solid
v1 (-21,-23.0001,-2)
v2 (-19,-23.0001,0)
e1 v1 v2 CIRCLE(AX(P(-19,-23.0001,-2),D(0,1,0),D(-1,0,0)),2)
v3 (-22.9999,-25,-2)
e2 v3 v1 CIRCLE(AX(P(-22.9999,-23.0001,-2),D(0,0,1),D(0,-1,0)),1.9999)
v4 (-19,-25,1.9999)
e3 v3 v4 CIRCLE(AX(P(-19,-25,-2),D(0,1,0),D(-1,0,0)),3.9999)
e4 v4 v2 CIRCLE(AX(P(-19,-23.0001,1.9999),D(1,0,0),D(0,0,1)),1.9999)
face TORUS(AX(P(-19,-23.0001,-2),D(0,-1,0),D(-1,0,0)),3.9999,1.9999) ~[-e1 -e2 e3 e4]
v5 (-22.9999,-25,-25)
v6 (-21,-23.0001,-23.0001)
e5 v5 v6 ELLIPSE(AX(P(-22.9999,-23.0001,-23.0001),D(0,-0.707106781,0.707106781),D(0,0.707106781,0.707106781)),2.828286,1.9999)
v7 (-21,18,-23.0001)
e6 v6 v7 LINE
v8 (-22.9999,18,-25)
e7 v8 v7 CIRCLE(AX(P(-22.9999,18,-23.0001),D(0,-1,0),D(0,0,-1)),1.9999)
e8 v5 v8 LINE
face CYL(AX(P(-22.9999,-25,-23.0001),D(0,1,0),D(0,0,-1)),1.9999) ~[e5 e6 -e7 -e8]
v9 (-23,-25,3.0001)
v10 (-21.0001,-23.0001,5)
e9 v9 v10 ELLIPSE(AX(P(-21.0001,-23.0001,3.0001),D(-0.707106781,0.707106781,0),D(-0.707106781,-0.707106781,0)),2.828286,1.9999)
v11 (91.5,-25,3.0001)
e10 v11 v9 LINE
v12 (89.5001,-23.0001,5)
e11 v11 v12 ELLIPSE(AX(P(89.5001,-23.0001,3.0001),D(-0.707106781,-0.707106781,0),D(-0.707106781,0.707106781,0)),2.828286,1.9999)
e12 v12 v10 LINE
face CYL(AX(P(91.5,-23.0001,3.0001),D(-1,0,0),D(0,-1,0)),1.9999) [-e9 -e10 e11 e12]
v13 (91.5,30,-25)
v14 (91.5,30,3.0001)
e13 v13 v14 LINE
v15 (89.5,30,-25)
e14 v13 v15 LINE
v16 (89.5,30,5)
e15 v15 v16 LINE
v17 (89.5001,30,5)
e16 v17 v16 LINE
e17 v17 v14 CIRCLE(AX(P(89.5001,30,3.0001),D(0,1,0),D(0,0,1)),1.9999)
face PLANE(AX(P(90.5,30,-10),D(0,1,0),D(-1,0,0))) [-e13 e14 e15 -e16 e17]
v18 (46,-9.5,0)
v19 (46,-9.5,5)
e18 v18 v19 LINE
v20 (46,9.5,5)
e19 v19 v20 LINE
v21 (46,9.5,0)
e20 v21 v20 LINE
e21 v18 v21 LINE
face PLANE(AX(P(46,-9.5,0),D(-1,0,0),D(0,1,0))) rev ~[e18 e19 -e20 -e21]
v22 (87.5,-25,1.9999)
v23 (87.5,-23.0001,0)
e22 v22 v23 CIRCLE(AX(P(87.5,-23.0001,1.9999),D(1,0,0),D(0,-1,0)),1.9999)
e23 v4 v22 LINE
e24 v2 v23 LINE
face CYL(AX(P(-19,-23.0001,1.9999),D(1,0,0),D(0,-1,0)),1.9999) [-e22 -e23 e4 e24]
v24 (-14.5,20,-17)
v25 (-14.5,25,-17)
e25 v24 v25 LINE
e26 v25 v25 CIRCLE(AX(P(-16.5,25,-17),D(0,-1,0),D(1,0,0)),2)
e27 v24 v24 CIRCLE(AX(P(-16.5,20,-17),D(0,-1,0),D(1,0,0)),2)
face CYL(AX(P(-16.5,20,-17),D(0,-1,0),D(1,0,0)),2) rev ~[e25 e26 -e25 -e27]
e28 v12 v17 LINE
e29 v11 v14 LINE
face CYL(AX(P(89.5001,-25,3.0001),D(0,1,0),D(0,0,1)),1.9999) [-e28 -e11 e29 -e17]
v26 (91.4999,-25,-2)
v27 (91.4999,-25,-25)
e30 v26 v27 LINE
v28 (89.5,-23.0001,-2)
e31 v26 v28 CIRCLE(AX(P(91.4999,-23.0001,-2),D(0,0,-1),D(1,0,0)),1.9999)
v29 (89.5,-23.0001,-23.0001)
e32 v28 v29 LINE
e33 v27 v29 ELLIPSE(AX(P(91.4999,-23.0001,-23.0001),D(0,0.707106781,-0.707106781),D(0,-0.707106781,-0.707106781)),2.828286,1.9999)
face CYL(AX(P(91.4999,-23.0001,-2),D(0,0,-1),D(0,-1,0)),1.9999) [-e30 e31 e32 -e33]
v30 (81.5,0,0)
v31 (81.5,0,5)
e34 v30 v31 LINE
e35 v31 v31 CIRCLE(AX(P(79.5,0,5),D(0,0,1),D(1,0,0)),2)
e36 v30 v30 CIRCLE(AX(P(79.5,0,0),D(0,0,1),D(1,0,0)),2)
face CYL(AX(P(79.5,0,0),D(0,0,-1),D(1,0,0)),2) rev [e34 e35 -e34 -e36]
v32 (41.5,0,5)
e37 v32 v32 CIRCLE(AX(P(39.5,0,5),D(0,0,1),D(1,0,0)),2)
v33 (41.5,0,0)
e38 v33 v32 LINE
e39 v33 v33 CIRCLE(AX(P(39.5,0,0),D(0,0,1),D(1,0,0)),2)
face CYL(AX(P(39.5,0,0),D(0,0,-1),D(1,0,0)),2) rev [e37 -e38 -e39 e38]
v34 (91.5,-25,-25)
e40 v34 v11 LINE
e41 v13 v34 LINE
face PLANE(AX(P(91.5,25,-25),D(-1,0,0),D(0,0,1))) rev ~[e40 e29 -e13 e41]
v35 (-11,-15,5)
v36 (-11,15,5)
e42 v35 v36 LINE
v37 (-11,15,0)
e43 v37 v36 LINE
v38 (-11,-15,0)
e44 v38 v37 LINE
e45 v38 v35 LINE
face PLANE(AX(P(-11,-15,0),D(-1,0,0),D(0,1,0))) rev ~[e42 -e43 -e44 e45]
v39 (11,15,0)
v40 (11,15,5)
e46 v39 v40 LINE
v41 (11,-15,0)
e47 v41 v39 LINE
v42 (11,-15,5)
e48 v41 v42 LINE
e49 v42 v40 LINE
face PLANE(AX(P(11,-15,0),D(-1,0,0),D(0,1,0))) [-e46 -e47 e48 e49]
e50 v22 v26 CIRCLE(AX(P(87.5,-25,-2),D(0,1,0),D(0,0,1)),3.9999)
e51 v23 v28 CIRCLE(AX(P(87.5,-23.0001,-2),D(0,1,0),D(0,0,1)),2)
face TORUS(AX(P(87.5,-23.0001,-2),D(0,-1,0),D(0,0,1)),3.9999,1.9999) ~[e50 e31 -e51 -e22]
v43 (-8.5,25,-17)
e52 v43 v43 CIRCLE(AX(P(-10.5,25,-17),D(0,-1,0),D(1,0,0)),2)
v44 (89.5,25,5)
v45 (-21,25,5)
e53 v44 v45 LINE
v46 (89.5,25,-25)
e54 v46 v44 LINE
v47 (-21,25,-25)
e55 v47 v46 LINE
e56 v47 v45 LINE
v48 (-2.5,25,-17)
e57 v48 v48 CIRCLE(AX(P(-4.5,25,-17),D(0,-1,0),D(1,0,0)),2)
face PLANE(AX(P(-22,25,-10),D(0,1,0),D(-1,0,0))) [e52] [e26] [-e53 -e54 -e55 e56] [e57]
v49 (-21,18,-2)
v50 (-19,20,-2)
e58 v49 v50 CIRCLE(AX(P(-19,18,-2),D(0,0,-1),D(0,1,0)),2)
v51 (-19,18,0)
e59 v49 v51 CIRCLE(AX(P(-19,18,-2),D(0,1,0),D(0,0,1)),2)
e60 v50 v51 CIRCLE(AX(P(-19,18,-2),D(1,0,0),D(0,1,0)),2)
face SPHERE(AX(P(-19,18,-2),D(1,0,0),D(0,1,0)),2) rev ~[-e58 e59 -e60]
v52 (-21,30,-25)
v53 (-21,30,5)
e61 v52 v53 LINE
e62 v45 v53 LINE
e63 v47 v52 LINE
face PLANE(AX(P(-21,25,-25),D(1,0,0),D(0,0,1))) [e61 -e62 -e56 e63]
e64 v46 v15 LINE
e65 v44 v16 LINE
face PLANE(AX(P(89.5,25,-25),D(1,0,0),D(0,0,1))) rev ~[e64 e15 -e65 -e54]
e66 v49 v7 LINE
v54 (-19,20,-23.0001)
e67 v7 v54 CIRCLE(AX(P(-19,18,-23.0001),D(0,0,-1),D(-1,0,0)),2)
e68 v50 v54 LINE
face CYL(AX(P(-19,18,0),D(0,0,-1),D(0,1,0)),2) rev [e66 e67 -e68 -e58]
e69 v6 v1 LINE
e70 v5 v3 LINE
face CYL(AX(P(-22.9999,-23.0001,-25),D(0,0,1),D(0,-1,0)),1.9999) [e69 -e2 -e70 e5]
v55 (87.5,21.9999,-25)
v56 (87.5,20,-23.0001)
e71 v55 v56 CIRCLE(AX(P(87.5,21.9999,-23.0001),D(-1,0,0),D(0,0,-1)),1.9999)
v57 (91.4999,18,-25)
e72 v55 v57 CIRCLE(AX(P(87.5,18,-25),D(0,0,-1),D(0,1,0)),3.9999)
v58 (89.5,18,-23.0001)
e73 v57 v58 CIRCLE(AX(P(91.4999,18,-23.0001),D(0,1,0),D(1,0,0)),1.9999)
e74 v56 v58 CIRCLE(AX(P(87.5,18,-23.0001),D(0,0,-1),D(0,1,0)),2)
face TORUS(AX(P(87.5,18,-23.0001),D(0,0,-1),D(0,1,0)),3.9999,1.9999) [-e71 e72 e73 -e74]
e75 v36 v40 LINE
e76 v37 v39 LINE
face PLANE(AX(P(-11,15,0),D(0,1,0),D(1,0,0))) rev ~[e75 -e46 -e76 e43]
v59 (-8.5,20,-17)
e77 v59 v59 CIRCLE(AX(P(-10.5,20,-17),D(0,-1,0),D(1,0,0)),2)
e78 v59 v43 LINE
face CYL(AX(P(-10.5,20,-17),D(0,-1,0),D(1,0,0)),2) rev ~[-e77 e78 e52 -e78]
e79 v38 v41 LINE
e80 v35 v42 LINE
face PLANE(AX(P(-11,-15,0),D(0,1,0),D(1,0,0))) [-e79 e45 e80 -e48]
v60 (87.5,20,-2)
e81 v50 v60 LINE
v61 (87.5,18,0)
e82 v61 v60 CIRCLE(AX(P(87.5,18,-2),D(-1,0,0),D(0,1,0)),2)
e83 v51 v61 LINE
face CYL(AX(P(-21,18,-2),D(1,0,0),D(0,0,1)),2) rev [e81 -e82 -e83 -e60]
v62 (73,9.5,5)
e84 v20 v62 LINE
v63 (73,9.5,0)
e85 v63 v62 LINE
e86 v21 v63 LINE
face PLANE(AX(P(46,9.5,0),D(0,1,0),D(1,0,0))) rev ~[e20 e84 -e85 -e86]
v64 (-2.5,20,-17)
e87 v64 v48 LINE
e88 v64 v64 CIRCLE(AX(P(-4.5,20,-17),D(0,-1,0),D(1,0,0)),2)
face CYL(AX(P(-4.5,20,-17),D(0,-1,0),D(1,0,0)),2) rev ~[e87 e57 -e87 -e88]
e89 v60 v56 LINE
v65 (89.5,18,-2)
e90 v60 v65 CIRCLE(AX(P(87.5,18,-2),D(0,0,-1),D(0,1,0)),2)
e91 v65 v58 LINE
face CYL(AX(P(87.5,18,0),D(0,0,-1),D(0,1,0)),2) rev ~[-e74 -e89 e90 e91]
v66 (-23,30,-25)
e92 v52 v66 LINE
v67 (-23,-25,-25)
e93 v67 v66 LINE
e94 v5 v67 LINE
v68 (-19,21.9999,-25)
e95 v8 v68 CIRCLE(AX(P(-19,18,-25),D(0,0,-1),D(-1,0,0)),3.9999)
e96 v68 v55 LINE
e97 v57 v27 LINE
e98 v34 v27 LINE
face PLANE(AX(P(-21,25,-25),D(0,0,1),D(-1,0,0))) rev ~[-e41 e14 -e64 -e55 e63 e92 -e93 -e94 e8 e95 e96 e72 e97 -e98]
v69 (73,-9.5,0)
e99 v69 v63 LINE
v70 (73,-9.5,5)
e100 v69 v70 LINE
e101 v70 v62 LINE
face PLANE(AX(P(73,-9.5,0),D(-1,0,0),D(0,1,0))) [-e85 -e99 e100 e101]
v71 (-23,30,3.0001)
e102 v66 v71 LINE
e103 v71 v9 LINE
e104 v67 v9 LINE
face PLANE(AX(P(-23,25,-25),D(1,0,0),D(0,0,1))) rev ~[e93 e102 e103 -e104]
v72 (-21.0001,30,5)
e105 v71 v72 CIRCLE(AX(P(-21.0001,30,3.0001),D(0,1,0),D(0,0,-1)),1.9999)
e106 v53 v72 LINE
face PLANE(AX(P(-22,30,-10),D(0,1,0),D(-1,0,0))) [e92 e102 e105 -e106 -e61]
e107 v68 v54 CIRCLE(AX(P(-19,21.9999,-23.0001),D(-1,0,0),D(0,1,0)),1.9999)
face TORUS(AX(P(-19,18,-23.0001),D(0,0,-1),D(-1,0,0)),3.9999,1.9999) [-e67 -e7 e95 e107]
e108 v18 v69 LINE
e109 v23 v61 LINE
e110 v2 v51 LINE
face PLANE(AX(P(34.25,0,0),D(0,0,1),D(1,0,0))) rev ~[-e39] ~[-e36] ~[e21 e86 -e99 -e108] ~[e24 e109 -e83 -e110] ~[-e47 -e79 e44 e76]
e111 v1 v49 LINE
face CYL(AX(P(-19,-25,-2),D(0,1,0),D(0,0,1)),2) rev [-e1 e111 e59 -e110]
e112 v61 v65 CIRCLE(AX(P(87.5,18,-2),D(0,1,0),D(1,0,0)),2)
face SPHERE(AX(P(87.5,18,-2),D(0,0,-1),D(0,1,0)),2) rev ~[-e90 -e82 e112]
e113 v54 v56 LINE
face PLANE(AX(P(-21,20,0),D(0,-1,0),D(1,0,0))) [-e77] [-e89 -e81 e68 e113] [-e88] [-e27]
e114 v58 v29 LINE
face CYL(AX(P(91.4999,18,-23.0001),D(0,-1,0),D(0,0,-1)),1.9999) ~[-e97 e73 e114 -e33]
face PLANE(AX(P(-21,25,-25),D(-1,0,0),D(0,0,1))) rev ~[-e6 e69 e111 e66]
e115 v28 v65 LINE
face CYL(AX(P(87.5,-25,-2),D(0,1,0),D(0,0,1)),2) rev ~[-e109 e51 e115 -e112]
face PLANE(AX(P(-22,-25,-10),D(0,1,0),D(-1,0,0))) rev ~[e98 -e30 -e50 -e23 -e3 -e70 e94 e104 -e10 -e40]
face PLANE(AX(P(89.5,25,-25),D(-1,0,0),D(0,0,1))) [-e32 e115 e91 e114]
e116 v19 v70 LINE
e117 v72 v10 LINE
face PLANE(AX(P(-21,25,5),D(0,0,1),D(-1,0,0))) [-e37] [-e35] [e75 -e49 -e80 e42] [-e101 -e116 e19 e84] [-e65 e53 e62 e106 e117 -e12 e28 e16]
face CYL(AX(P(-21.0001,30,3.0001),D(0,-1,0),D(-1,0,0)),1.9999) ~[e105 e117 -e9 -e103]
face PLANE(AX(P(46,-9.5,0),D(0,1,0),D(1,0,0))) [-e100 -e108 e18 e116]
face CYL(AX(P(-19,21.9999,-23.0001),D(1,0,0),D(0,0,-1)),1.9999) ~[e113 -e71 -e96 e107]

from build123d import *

# Parameters (mm, degrees)
F0_W     = 110.5
F0_H     = 50
F0_W_2   = 22
F0_H_2   = 30
F0_R     = 2
F0_W_3   = 27
F0_H_3   = 19
F1_DEPTH = 5
F2_W     = 110.5
F2_H     = 5
F3_DEPTH = 25
F4_R     = 2
F5_DEPTH = 5.001
F6_W     = 2
F6_H     = 30
F7_DEPTH = 50
F8_DEPTH = 5
F9_F1_R  = 2
F9_F2_R  = 1.9999


# Not quite as in the source:
# - a fillet or chamfer is up to 0.001 mm smaller than in the source, because OpenCascade refuses the exact size


with BuildPart() as f1:
    # F0 (on Top) → F1 (new body)
    with BuildSketch(Plane.XY):
        with Locations((34.25, 0)):
            Rectangle(F0_W, F0_H)
        Rectangle(F0_W_2, F0_H_2, mode=Mode.SUBTRACT)
        with Locations((39.5, 0)):
            Circle(F0_R, mode=Mode.SUBTRACT)
        with Locations((59.5, 0)):
            Rectangle(F0_W_3, F0_H_3, mode=Mode.SUBTRACT)
        with Locations((79.5, 0)):
            Circle(F0_R, mode=Mode.SUBTRACT)
    extrude(amount=F1_DEPTH)

    # F2 (on face) → F3 (join)
    with BuildSketch(Plane(origin=(0, 0, 0), x_dir=(1, 0, 0), z_dir=(0, 0, -1))):
        with Locations((34.25, -22.5)):
            Rectangle(F2_W, F2_H)
    extrude(amount=F3_DEPTH)

    # F4 (on face) → F5 (cut, through all)
    with BuildSketch(Plane.XZ.offset(-20)):
        with Locations((-16.5, -17)):
            Circle(F4_R)
        with Locations((-10.5, -17)):
            Circle(F4_R)
        with Locations((-4.5, -17)):
            Circle(F4_R)
    extrude(amount=-F5_DEPTH, mode=Mode.SUBTRACT)

    # F6 (on face) → F7 (join, through all)
    with BuildSketch(Plane(origin=(0, 25, 0), x_dir=(-1, 0, 0), z_dir=(0, 1, 0))):
        with Locations((22, -10)):
            Rectangle(F6_W, F6_H)
        with Locations((-90.5, -10)):
            Rectangle(F6_W, F6_H)
    extrude(amount=-F7_DEPTH)

    # F6 (on face) → F8 (join)
    with BuildSketch(Plane(origin=(0, 25, 0), x_dir=(-1, 0, 0), z_dir=(0, 1, 0))):
        with Locations((22, -10)):
            Rectangle(F6_W, F6_H)
        with Locations((-90.5, -10)):
            Rectangle(F6_W, F6_H)
    extrude(amount=F8_DEPTH)

    # F9: fillet of radius 2 on 10 edges, made by hand

    # F9_f1
    f9_f1_edges = [f1.edges().sort_by_distance(p)[0] for p in [
        (89.5, 20, -12.5),
        (34.25, 20, 0),
        (89.5, -2.5, 0),
        (-21, 20, -12.5),
        (-21, -2.5, 0),
    ]]
    fillet(f9_f1_edges, radius=F9_F1_R)

    # F9_f2 (radius 2 in the source; OpenCascade refuses exactly that, so slightly less here)
    f9_f2_edges = [f1.edges().sort_by_distance(p)[0] for p in [
        (34.25, -25, 0),
        (34.25, -25, 5),
        (89.5, -3.5, -25),
        (-23, 2.5, 5),
        (91.5, 2.5, 5),
        (88.9142135624, 19.4142135624, -25),
        (-20.4142135624, -25, -0.5857864376),
        (88.9142135624, -25, -0.5857864376),
    ]]
    fillet(f9_f2_edges, radius=F9_F2_R)


solid = f1.part
